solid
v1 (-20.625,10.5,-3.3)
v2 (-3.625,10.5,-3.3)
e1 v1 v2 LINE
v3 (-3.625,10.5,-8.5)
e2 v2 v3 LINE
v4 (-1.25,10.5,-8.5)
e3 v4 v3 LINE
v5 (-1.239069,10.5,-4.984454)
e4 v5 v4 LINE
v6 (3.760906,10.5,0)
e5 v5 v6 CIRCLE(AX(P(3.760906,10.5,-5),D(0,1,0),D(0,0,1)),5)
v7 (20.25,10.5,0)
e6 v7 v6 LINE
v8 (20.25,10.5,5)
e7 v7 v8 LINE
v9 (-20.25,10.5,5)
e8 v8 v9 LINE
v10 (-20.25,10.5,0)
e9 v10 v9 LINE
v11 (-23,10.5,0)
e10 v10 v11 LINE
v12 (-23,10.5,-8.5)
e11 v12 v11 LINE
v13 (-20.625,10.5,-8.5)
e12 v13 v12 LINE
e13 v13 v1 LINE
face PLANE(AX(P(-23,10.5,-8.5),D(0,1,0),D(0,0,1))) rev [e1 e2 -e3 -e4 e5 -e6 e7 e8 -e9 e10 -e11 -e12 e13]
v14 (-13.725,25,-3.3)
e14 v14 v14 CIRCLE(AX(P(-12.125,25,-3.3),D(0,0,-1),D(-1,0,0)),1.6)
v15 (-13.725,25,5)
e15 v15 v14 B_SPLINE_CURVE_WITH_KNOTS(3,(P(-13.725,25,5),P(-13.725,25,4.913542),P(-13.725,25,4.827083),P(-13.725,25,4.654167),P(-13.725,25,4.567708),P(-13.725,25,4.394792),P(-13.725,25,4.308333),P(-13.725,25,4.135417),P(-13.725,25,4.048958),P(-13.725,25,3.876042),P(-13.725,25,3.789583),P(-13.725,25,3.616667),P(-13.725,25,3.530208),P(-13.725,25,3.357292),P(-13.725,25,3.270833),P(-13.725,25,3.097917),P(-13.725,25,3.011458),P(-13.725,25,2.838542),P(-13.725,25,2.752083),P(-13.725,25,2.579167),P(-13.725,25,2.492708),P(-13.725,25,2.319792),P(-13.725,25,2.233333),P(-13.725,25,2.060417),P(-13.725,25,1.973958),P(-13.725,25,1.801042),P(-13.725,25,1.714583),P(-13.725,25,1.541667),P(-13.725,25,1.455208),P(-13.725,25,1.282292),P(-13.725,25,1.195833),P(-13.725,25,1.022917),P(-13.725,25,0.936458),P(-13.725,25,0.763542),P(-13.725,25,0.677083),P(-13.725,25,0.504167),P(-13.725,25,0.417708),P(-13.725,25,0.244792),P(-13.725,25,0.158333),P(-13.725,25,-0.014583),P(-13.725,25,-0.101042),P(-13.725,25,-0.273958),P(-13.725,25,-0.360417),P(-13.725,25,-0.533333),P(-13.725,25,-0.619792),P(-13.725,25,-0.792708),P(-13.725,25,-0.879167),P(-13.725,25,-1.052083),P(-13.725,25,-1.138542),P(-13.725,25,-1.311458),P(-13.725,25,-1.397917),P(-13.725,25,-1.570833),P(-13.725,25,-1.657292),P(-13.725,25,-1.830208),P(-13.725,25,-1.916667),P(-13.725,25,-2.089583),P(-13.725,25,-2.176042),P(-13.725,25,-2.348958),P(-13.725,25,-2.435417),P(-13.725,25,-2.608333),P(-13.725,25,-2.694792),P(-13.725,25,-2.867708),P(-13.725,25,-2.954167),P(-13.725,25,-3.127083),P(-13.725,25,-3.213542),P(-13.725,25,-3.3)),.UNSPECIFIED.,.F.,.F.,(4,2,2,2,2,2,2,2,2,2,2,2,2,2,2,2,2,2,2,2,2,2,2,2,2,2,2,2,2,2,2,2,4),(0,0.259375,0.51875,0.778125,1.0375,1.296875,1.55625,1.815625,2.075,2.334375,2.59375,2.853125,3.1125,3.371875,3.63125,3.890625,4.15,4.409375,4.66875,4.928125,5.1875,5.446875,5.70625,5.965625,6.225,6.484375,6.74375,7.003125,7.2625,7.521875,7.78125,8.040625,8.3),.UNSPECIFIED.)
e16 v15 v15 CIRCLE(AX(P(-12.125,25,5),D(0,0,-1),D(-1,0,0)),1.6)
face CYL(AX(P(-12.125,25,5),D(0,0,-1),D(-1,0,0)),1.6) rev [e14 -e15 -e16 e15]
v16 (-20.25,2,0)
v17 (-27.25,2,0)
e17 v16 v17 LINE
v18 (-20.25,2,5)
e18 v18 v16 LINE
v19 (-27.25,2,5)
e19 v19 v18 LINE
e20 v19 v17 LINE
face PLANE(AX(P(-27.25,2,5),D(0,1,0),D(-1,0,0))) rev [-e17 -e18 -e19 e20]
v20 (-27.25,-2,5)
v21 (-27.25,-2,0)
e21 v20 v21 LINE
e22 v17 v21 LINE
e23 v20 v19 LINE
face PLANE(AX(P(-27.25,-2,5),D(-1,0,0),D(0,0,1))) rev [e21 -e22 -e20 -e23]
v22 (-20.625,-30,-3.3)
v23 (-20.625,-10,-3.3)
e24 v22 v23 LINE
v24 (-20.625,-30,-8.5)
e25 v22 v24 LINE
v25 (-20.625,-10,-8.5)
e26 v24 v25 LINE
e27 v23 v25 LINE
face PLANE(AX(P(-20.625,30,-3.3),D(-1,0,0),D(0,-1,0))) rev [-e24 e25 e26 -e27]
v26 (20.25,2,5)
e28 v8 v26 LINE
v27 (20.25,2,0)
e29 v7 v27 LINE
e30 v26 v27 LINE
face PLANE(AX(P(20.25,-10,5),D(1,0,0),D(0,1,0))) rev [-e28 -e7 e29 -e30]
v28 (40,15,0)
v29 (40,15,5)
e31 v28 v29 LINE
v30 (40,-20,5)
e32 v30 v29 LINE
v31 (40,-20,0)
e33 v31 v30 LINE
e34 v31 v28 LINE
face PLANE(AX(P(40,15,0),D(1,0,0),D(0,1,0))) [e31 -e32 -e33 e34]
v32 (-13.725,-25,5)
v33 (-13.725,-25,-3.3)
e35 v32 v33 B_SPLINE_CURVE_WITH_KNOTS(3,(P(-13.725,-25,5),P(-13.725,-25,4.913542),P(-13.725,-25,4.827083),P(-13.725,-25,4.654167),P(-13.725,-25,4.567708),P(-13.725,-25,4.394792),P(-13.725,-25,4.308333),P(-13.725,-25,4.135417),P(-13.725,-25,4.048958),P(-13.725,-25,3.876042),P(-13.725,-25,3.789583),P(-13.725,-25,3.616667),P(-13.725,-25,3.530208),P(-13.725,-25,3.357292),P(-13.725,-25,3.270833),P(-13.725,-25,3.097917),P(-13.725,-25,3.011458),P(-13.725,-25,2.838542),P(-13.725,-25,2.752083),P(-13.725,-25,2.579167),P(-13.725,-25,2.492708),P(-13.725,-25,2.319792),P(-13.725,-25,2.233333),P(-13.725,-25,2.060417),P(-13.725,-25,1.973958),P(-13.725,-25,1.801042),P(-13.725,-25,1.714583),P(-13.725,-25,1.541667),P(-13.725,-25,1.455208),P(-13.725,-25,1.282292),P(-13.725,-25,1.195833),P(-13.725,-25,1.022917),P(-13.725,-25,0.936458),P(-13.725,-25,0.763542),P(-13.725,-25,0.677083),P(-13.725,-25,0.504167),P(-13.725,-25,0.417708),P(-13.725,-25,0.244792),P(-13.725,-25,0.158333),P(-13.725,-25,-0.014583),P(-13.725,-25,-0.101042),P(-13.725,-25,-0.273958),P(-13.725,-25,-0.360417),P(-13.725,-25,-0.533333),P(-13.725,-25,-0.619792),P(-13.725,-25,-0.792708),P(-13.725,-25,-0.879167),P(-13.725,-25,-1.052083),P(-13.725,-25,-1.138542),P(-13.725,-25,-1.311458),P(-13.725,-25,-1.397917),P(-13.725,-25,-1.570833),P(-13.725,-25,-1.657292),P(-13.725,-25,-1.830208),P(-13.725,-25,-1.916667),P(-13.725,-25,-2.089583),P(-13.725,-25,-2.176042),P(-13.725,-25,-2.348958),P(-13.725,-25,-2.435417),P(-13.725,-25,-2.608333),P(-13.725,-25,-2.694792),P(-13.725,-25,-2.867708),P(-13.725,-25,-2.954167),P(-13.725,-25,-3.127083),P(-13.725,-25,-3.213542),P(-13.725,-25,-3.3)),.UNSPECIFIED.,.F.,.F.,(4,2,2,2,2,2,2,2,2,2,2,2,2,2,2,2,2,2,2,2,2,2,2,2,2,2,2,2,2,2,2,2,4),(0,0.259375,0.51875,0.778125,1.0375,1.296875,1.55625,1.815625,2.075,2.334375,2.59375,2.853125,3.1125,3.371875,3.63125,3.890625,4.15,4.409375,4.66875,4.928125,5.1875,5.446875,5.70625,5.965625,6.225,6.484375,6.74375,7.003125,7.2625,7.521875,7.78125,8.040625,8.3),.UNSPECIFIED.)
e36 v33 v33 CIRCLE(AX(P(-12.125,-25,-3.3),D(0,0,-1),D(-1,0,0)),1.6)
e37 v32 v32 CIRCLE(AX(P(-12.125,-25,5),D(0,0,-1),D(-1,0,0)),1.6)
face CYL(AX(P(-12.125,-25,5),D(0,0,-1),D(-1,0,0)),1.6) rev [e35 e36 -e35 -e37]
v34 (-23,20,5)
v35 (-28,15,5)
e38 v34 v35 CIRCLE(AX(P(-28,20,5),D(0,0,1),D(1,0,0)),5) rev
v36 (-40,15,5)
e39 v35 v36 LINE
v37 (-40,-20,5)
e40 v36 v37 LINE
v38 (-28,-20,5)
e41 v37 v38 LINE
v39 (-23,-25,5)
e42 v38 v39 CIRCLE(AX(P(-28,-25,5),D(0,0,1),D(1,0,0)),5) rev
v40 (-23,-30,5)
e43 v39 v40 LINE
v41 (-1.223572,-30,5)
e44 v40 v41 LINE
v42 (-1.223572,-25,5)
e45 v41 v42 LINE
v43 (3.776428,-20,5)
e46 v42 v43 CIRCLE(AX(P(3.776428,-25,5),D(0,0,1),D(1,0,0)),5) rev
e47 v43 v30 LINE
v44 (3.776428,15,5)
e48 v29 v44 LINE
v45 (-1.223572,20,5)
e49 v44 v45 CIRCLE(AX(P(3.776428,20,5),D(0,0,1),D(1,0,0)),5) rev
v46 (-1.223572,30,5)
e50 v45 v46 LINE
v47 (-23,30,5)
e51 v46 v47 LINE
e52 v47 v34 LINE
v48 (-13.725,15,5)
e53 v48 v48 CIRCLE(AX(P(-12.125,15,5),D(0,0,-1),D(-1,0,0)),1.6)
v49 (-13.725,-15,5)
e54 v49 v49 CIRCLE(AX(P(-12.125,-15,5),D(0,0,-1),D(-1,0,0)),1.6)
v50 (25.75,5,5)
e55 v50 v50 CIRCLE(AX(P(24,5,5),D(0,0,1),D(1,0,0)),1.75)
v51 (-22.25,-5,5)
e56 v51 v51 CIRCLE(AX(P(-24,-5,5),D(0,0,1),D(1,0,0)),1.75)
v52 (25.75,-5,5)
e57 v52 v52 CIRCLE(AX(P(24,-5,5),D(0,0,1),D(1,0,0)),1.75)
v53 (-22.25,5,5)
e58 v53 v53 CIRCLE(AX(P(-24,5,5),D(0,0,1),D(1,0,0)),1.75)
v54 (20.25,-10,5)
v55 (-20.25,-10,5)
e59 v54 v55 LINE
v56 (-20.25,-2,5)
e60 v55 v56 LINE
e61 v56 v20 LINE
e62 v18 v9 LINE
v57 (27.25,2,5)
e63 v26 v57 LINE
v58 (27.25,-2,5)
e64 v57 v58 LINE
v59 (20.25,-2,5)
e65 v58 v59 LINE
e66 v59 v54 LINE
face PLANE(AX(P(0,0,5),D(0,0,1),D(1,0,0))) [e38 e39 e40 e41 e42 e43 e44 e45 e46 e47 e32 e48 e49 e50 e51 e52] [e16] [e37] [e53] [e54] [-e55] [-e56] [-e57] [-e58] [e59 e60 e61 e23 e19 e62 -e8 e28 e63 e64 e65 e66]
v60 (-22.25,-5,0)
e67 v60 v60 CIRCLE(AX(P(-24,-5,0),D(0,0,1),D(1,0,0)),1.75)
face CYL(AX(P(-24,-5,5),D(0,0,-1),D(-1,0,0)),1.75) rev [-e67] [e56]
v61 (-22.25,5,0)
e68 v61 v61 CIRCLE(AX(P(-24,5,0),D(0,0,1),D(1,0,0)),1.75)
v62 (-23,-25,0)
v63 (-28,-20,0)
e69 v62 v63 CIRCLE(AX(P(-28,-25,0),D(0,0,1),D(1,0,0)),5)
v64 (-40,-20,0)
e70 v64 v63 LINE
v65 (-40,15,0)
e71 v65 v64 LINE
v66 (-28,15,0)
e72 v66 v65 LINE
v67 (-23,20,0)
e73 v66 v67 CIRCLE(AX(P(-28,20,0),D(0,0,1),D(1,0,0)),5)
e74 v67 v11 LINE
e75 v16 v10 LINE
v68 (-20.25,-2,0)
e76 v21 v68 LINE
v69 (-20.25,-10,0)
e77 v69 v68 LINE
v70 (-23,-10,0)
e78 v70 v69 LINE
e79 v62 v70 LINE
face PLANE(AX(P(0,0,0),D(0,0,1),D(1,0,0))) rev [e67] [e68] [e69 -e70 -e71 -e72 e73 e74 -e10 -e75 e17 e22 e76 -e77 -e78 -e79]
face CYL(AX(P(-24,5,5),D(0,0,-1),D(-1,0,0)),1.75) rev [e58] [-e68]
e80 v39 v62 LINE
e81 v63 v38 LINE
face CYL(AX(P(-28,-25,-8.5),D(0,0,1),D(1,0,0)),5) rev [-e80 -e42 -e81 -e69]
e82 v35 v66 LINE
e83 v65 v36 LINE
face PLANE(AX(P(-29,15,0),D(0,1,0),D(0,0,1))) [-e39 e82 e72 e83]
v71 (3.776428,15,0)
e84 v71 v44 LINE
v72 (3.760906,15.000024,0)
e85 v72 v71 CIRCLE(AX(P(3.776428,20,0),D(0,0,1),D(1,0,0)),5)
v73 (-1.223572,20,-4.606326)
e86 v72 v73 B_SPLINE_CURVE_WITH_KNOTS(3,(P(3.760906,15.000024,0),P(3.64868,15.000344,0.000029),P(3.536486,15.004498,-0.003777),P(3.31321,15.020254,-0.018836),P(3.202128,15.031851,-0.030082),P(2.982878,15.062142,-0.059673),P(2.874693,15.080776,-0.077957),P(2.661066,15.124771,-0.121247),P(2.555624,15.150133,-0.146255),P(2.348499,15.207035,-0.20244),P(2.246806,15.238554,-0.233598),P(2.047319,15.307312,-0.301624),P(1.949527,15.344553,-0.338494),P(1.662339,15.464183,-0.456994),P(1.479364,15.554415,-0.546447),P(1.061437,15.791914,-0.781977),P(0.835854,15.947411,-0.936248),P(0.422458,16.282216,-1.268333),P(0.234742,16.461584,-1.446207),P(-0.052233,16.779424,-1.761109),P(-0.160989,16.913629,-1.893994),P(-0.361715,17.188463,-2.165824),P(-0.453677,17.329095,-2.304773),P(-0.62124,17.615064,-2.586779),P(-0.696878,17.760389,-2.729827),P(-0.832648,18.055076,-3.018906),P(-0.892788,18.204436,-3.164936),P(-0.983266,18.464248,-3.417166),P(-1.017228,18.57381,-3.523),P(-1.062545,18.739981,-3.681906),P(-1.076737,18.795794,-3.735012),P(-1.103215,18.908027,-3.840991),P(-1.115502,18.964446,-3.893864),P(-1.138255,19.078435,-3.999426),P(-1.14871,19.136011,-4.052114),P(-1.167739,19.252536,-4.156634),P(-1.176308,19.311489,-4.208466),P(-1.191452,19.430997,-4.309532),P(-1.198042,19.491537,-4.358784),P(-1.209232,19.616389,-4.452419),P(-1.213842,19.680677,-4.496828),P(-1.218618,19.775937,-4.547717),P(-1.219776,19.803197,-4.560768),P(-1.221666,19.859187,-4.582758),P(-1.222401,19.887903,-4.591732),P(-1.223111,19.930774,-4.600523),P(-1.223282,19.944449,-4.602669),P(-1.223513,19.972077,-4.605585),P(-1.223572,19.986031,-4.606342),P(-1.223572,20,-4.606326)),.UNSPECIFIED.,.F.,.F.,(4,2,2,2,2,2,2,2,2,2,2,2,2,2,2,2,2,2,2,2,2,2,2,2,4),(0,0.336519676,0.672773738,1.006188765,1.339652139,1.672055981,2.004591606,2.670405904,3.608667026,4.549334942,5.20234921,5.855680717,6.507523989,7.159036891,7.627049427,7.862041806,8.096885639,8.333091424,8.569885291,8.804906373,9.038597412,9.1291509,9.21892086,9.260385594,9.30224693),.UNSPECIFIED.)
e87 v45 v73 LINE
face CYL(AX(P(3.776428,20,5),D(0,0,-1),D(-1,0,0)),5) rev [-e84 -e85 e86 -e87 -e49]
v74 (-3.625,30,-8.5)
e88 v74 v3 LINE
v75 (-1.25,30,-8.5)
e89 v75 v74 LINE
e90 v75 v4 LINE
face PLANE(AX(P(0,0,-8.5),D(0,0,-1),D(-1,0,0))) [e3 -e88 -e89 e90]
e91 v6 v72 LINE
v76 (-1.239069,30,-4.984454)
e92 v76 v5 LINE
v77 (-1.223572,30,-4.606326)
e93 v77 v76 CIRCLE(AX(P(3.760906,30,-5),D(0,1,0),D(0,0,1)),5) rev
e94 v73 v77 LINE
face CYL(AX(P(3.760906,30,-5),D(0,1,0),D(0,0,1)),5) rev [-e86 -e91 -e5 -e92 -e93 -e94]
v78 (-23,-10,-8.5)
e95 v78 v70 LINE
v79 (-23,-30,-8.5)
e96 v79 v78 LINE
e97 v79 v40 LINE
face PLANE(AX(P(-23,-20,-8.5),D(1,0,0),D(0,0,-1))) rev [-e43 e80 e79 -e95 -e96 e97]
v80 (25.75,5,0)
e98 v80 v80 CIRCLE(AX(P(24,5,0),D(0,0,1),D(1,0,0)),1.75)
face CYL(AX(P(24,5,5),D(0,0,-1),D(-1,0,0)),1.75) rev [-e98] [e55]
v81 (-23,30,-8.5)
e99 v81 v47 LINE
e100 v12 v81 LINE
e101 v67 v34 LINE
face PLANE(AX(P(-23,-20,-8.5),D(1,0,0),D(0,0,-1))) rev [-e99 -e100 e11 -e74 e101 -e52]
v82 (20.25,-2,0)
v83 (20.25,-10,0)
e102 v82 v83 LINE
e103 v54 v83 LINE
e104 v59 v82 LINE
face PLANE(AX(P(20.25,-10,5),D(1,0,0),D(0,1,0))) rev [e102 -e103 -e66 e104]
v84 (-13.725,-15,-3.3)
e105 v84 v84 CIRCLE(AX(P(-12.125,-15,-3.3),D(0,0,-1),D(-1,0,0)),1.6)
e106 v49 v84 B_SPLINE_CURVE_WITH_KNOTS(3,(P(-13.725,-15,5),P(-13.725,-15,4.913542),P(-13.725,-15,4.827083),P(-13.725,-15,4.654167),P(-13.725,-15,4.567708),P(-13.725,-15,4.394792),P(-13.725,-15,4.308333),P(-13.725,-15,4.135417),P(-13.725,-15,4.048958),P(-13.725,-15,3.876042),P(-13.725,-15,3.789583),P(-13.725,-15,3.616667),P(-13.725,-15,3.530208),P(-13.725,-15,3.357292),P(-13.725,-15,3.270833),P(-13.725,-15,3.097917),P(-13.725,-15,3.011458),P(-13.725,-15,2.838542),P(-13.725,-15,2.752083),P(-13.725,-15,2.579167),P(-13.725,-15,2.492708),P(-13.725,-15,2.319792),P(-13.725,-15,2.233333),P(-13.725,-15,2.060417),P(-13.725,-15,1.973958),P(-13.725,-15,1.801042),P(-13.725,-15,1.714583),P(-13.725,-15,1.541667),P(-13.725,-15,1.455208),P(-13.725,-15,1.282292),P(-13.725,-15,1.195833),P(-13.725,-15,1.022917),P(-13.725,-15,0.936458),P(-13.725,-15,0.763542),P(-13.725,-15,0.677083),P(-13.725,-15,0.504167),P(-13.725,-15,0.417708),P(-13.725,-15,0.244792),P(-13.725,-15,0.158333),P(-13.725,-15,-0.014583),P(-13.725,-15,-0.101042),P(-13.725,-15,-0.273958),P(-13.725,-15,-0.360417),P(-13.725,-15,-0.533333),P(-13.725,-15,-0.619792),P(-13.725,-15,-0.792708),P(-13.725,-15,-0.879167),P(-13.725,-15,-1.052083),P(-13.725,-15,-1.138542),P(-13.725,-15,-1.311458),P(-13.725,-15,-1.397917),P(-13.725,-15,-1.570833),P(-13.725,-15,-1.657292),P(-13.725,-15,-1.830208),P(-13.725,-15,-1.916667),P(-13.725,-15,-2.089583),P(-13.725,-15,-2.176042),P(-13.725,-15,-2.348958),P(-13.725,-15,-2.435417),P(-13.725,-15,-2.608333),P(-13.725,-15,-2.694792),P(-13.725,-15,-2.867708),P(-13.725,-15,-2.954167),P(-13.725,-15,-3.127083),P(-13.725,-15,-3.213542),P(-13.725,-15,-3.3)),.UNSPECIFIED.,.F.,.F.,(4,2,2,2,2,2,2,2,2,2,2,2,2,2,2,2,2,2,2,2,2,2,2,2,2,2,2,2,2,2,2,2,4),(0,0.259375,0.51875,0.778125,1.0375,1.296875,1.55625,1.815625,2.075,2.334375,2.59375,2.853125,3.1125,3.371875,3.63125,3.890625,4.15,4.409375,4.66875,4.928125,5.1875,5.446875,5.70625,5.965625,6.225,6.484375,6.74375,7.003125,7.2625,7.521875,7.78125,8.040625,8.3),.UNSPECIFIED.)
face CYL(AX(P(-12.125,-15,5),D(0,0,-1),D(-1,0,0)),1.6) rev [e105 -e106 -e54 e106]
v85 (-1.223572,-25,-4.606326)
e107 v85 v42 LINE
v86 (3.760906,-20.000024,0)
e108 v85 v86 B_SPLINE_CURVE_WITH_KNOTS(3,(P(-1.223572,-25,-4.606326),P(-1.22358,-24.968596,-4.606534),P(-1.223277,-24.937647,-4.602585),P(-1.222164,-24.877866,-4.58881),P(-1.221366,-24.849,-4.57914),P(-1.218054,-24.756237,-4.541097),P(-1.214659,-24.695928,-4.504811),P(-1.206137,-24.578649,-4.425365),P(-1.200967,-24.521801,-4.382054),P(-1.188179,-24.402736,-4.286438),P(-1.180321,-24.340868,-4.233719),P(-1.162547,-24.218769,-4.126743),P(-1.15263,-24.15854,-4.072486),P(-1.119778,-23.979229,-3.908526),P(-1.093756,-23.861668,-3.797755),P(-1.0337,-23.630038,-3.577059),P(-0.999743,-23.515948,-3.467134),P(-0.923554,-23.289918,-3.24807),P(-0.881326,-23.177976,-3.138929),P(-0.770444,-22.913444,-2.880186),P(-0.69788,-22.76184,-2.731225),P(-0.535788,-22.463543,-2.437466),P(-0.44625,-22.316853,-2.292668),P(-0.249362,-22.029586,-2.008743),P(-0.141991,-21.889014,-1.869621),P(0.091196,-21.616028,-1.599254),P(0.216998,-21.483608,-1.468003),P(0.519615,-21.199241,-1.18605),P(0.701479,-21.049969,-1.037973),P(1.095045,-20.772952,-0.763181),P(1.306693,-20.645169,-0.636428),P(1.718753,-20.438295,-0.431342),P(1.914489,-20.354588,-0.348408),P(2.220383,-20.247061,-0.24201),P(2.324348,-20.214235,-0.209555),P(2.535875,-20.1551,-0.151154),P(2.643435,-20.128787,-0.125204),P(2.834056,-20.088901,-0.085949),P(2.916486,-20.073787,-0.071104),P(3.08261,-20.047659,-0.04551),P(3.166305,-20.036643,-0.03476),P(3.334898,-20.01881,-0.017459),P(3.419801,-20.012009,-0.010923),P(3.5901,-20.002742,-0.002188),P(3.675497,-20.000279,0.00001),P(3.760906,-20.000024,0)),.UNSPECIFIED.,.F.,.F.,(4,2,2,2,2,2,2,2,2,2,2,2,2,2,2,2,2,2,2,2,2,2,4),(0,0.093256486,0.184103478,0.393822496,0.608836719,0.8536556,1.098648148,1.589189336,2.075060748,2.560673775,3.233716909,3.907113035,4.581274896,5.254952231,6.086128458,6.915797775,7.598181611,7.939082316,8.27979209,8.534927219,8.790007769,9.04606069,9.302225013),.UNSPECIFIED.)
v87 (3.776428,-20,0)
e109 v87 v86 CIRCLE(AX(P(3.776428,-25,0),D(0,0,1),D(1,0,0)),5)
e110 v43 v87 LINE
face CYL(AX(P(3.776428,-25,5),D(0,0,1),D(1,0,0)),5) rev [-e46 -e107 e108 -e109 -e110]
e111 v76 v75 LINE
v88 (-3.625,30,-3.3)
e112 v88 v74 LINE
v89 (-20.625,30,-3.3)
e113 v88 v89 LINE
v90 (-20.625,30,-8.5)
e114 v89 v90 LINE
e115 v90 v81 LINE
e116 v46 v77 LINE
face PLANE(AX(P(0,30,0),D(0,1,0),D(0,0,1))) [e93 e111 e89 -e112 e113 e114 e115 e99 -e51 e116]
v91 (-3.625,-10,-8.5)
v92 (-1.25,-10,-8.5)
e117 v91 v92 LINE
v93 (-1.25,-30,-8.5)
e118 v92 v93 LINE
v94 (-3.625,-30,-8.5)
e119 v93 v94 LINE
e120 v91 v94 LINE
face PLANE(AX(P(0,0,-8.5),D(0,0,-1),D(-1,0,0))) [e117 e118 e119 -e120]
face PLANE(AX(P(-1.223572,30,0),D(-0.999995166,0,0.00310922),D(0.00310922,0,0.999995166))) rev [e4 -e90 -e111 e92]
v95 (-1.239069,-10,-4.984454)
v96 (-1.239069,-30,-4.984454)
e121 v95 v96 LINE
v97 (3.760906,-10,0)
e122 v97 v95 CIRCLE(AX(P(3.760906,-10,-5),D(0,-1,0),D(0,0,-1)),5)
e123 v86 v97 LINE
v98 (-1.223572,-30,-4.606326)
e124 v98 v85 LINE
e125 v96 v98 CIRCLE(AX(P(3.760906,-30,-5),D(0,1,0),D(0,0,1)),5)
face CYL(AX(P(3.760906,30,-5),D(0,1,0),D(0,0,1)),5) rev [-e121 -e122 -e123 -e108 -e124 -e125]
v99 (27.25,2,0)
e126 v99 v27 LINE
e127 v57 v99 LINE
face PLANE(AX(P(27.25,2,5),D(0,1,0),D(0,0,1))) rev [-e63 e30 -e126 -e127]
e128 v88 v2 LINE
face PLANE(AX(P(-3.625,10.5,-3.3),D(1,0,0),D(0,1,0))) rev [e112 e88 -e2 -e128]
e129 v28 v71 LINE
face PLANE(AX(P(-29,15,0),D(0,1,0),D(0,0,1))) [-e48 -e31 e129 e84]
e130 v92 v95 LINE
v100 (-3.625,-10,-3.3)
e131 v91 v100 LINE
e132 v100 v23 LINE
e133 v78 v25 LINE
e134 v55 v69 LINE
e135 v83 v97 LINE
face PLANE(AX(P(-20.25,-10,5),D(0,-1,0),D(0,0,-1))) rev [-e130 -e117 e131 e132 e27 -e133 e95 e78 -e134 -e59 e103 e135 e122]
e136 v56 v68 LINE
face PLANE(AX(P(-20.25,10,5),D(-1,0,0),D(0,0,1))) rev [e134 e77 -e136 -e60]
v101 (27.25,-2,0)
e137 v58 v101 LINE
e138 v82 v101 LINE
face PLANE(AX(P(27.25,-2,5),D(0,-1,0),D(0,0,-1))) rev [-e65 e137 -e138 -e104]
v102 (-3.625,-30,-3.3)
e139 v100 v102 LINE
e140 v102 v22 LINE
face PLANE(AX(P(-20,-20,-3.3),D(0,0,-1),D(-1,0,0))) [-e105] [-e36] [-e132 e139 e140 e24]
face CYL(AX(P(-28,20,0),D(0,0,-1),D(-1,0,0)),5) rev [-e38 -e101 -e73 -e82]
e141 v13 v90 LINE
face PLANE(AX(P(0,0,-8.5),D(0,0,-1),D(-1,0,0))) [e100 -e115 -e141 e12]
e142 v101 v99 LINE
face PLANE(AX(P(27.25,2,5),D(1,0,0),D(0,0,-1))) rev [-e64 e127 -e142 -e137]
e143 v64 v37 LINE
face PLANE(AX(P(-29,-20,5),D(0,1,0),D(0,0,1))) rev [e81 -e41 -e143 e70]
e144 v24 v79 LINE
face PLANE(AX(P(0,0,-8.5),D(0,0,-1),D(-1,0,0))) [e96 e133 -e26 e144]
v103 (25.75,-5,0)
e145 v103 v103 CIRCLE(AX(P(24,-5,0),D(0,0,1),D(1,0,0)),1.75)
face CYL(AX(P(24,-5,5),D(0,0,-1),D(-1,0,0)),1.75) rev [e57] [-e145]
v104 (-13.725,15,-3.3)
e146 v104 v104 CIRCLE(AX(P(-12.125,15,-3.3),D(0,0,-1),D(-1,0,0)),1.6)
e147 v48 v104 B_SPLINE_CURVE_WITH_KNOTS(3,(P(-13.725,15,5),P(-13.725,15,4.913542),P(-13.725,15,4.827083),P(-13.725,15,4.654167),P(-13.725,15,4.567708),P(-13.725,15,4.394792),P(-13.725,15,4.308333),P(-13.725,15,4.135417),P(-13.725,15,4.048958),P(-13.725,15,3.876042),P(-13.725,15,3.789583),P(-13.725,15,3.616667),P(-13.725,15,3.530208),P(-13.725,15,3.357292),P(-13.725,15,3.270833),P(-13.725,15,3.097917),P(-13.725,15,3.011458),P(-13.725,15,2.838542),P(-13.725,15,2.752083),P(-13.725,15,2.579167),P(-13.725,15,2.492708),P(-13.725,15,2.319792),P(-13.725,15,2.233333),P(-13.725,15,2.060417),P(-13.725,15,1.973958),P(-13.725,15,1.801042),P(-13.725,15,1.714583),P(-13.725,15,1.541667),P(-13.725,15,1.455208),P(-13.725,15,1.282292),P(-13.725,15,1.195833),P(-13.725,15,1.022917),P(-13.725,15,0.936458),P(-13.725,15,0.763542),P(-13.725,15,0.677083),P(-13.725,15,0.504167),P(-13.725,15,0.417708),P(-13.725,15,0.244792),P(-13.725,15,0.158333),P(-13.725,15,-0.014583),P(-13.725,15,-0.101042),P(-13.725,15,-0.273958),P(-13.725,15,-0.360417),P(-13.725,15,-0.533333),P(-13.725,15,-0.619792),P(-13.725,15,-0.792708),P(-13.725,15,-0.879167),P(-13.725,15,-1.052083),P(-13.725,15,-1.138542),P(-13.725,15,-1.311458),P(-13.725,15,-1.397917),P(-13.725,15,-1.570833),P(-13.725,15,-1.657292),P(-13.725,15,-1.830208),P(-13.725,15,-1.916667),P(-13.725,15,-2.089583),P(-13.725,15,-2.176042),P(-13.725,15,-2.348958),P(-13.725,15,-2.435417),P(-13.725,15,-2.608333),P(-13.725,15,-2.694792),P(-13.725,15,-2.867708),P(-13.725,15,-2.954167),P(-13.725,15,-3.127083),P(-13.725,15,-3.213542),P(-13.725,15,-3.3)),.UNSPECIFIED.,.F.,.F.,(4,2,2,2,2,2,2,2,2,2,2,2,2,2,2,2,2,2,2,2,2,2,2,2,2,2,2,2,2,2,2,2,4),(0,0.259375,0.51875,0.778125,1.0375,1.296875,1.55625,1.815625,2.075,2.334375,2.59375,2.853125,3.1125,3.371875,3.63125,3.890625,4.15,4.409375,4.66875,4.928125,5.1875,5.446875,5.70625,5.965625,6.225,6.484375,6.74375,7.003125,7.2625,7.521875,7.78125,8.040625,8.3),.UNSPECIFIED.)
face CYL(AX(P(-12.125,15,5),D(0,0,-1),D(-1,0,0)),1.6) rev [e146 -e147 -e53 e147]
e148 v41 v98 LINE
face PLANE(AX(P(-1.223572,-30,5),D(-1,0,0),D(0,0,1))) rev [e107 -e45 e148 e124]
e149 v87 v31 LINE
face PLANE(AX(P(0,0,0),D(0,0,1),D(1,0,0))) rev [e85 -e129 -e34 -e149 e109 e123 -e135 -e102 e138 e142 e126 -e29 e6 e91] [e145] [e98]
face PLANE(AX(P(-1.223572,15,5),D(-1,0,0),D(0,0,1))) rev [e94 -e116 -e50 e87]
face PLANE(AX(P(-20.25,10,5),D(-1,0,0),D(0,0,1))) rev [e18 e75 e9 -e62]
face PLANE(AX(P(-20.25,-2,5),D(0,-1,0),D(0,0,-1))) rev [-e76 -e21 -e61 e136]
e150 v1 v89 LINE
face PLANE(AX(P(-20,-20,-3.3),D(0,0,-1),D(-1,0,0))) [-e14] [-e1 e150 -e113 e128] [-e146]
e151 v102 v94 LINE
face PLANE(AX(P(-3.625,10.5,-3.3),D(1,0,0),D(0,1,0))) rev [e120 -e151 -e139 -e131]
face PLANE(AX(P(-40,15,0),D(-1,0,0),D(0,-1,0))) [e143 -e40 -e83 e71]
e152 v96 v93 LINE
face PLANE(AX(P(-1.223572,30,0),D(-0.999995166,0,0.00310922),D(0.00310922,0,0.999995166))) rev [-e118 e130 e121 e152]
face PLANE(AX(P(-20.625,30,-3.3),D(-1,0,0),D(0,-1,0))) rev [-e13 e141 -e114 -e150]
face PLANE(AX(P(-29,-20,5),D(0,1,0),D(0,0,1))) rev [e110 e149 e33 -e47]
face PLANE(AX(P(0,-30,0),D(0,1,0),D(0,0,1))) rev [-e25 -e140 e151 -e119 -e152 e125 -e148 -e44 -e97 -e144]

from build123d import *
from OCP.BRepAlgoAPI import BRepAlgoAPI_Cut
from OCP.TopTools import TopTools_ListOfShape

# Parameters (mm, degrees)
SKETCH_1_R               = 1.75
EXTRUDE_1_DEPTH          = 5
SKETCH_2_W               = 3
SKETCH_2_H               = 10
EXTRUDE_2_DEPTH          = 8.5
SKETCH_3_W               = 15.75
SKETCH_3_H               = 3.3
EXTRUDE_3_DEPTH          = 10
EXTRUDE_4_DEPTH          = 30
SKETCH_6_W               = 21.776428499
SKETCH_6_H               = 20.5
CUT_EXTRUDE_2_DEPTH      = 43.582273307
SKETCH_7_W               = 58
SKETCH_7_H               = 5
EXTRUDE_5_DEPTH          = 5
SKETCH_8_W               = 40.5
SKETCH_8_H               = 0.5
CUT_EXTRUDE_3_DEPTH      = 44.854874301
SKETCH_9_W               = 21.776428499
SKETCH_9_H               = 15
SKETCH_9_H_2             = 10
EXTRUDE_6_DEPTH          = 5
FILLET_1_R               = 5
SKETCH_10_R              = 1.6
CUT_EXTRUDE_4_DEPTH      = 43.542801976
FILLET_START             = 10.5
FILLET_2_DEPTH           = 9.5
FILLET_START_2           = 19.239089818
FILLET_2_2_DEPTH         = 10.760910182
FILLET_START_3           = -4.606326438
FILLET_2_3_DEPTH         = 4.606326438
FILLET_START_4           = -19.9999999
FILLET_3_DEPTH           = 9.9999999
FILLET_START_5           = -30
FILLET_3_2_DEPTH         = 17.8876
FILLET_START_6           = -4.606334035
FILLET_3_3_DEPTH         = 4.606334035
FILLET_START_7           = -25
FILLET_3_4_DEPTH         = 5
FILLET_START_8           = -20.000021607
FILLET_3_5_DEPTH         = 2.1607e-05
SKETCH_11_W              = 11
SKETCH_11_H              = 35
EXTRUDE_7_DEPTH          = 5
SKETCH_12_W              = 10
SKETCH_12_H              = 10
EXTRUDE_8_DEPTH          = 5
SKETCH_14_W              = 0.625
SKETCH_14_H              = 60
CUT_EXTRUDE_5_DEPTH      = 5.2
SKETCH_15_W              = 10
SKETCH_15_H              = 10
CUT_EXTRUDE_6_DEPTH      = 10
CUT_EXTRUDE_7_DEPTH      = 51.717354032
CUT_EXTRUDE_7_DEPTH_BACK = 51.717354032
SKETCH_16_W              = 7
SKETCH_16_H              = 4


with BuildPart() as part:
    # ｽｹｯﾁ1 → ﾎﾞｽ - 押し出し1 (new body)
    with BuildSketch(Plane.XY):
        Polygon((-20.25, 10), (-20.25, -10), (20.25, -10), (20.25, 10), (29, 10), (29, -20), (-29, -20), (-29, 10), align=None)
        with Locations((-24, 5)):
            Circle(SKETCH_1_R, mode=Mode.SUBTRACT)
        with Locations((-24, -5)):
            Circle(SKETCH_1_R, mode=Mode.SUBTRACT)
        with Locations((24, 5)):
            Circle(SKETCH_1_R, mode=Mode.SUBTRACT)
        with Locations((24, -5)):
            Circle(SKETCH_1_R, mode=Mode.SUBTRACT)
    extrude(amount=EXTRUDE_1_DEPTH)

    # ｽｹｯﾁ2 → ﾎﾞｽ - 押し出し2 (add)
    with BuildSketch(Plane(origin=(0, 0, 0), x_dir=(-1, 0, 0), z_dir=(0, 0, -1))):
        with Locations((21.5, -15)):
            Rectangle(SKETCH_2_W, SKETCH_2_H)
        with Locations((2.75, -15)):
            Rectangle(SKETCH_2_W, SKETCH_2_H)
    extrude(amount=EXTRUDE_2_DEPTH)

    # ｽｹｯﾁ3 → ﾎﾞｽ - 押し出し3 (add)
    with BuildSketch(Plane(origin=(0, -10, 0), x_dir=(1, 0, 0), z_dir=(0, 1, 0))):
        with Locations((-12.125, 1.65)):
            Rectangle(SKETCH_3_W, SKETCH_3_H)
    extrude(amount=-EXTRUDE_3_DEPTH)

    # ｽｹｯﾁ4 → ﾎﾞｽ - 押し出し4 (add, symmetric)
    with BuildSketch(Plane(origin=(0, 0, 0), x_dir=(1, 0, 0), z_dir=(0, 1, 0))):
        Polygon((-23, 8.5), (-23, 0), (-1.223571501, 0), (-1.25, 8.5), (-4.25, 8.5), (-4.25, 3.3), (-20, 3.3), (-20, 8.5), align=None)
    extrude(amount=EXTRUDE_4_DEPTH, both=True)

    # ｽｹｯﾁ6 → ｶｯﾄ - 押し出し2 (cut, through all)
    with BuildSketch(Plane.XY):
        with Locations((-12.11178575, 0.25)):
            Rectangle(SKETCH_6_W, SKETCH_6_H)
    extrude(amount=-CUT_EXTRUDE_2_DEPTH, mode=Mode.SUBTRACT)


with BuildPart() as cut_extrude_2_piece_1:
    # of the separate pieces the step leaves, piece 1, a body of its own (cut_extrude_2_pieces)
    add(part.part.solids().sort_by_distance((-20.25, 10, 0))[0])



with BuildPart() as cut_extrude_2_piece_2:
    # of the separate pieces the step leaves, piece 2, a body of its own (cut_extrude_2_pieces)
    add(part.part.solids().sort_by_distance((-23, 10.5, 0))[0])


with BuildPart() as cut_extrude_2_piece_1_1:
    add(cut_extrude_2_piece_1.part)

    add(cut_extrude_2_piece_2.part)  # ﾎﾞｽ - 押し出し5 merges ｶｯﾄ - 押し出し2 piece 2
    # ｽｹｯﾁ7 → ﾎﾞｽ - 押し出し5 (add)
    with BuildSketch(Plane.XY.offset(5)):
        with Locations((0, 12.5)):
            Rectangle(SKETCH_7_W, SKETCH_7_H)
    extrude(amount=-EXTRUDE_5_DEPTH)

    # ｽｹｯﾁ8 → ｶｯﾄ - 押し出し3 (cut, through all)
    with BuildSketch(Plane.XY.offset(5)):
        with Locations((0, 10.25)):
            Rectangle(SKETCH_8_W, SKETCH_8_H)
    extrude(amount=-CUT_EXTRUDE_3_DEPTH, mode=Mode.SUBTRACT)

    # ｽｹｯﾁ9 → ﾎﾞｽ - 押し出し6 (add)
    with BuildSketch(Plane.XY):
        with Locations((-12.11178575, 22.5)):
            Rectangle(SKETCH_9_W, SKETCH_9_H)
        with Locations((-12.11178575, -25)):
            Rectangle(SKETCH_9_W, SKETCH_9_H_2)
    extrude(amount=EXTRUDE_6_DEPTH)

    # ﾌｨﾚｯﾄ1
    # the kernel refuses this fillet: 5 mm, written as the material it adds along each edge
    with BuildSketch(Plane(origin=(-23, 15, 0), x_dir=(-1, 0, 0), z_dir=(0, 0, 1))) as fillet_1_piece_1:
        with BuildLine():
            CenterArc((FILLET_1_R, -FILLET_1_R), FILLET_1_R, 90, 90)
            Line((0, -FILLET_1_R), (0, 0))
            Line((0, 0), (FILLET_1_R, 0))
        make_face()
    extrude(amount=5)
    with BuildSketch(Plane(origin=(-1.223571501, 15, 0), x_dir=(1, 0, 0), z_dir=(0, 0, 1))) as fillet_1_piece_2_section:
        with BuildLine():
            CenterArc((FILLET_1_R, FILLET_1_R), FILLET_1_R, 180, 90)
            Line((0, FILLET_1_R), (0, 0))
            Line((0, 0), (FILLET_1_R, 0))
        make_face()
    fillet_1_piece_2 = extrude(amount=5, mode=Mode.PRIVATE)
    fillet_1_piece_2 = split(fillet_1_piece_2, bisect_by=Plane(origin=(-1.223571501, 15, 0), z_dir=(0.9999951663633728, 0, -0.003109220141828846)), keep=Keep.TOP, mode=Mode.PRIVATE)
    add(fillet_1_piece_2)
    with BuildSketch(Plane(origin=(-1.223571501, 15, 0), x_dir=(1, 0, 0), z_dir=(0, 0, 1))) as fillet_1_piece_3_section:
        with BuildLine():
            CenterArc((FILLET_1_R, FILLET_1_R), FILLET_1_R, 180, 90)
            Line((0, FILLET_1_R), (0, 0))
            Line((0, 0), (FILLET_1_R, 0))
        make_face()
    fillet_1_piece_3 = extrude(amount=5, mode=Mode.PRIVATE)
    fillet_1_piece_3 = split(fillet_1_piece_3, bisect_by=Plane(origin=(-1.223571501, 15, 0), z_dir=(-0.9999951663633728, 0, 0.003109220141828846)), keep=Keep.TOP, mode=Mode.PRIVATE)
    add(fillet_1_piece_3)
    with BuildSketch(Plane(origin=(-1.223571501, -20, 0), x_dir=(1, 0, 0), z_dir=(0, 0, 1))) as fillet_1_piece_4_section:
        with BuildLine():
            CenterArc((FILLET_1_R, -FILLET_1_R), FILLET_1_R, 90, 90)
            Line((0, -FILLET_1_R), (0, 0))
            Line((0, 0), (FILLET_1_R, 0))
        make_face()
    fillet_1_piece_4 = extrude(amount=5, mode=Mode.PRIVATE)
    fillet_1_piece_4 = split(fillet_1_piece_4, bisect_by=Plane(origin=(-1.223571501, -20, 0), z_dir=(0.9999951663633728, 0, -0.003109220141828846)), keep=Keep.TOP, mode=Mode.PRIVATE)
    add(fillet_1_piece_4)
    with BuildSketch(Plane(origin=(-1.223571501, -20, 0), x_dir=(1, 0, 0), z_dir=(0, 0, 1))) as fillet_1_piece_5_section:
        with BuildLine():
            CenterArc((FILLET_1_R, -FILLET_1_R), FILLET_1_R, 90, 90)
            Line((0, -FILLET_1_R), (0, 0))
            Line((0, 0), (FILLET_1_R, 0))
        make_face()
    fillet_1_piece_5 = extrude(amount=5, mode=Mode.PRIVATE)
    fillet_1_piece_5 = split(fillet_1_piece_5, bisect_by=Plane(origin=(-1.223571501, -20, 0), z_dir=(-0.9999951663633728, 0, 0.003109220141828846)), keep=Keep.TOP, mode=Mode.PRIVATE)
    add(fillet_1_piece_5)
    with BuildSketch(Plane(origin=(-23, -20, 0), x_dir=(-1, 0, 0), z_dir=(0, 0, 1))) as fillet_1_piece_6:
        with BuildLine():
            CenterArc((FILLET_1_R, FILLET_1_R), FILLET_1_R, 180, 90)
            Line((0, FILLET_1_R), (0, 0))
            Line((0, 0), (FILLET_1_R, 0))
        make_face()
    extrude(amount=5)

    # ｽｹｯﾁ10 → ｶｯﾄ - 押し出し4 (cut, through all)
    with BuildSketch(Plane(origin=(0, 0, -3.3), x_dir=(-1, 0, 0), z_dir=(0, 0, -1))):
        with Locations((12.125, 25)):
            Circle(SKETCH_10_R)
        with Locations((12.125, 15)):
            Circle(SKETCH_10_R)
        with Locations((12.125, -15)):
            Circle(SKETCH_10_R)
        with Locations((12.125, -25)):
            Circle(SKETCH_10_R)
    extrude(amount=-CUT_EXTRUDE_4_DEPTH, mode=Mode.SUBTRACT)

    # ﾌｨﾚｯﾄ2: read off the stored shape, not the designer's step
    # ﾌｨﾚｯﾄ2 outline → ﾌｨﾚｯﾄ2 (add)
    with BuildSketch(Plane(origin=(0, 0, 0), x_dir=(1, 0, 0), z_dir=(0, 1, 0)).offset(FILLET_START)):
        with BuildLine():
            ThreePointArc((3.760906491, 0), (0.230873241, 1.458973983), (-1.23906934, 4.984453899))
            Line((-1.23906934, 4.984453899), (-1.223571501, 0))
            Line((-1.223571501, 0), (3.760906491, 0))
        make_face()
    extrude(amount=FILLET_2_DEPTH)

    # Fillet 2 2 outline → Fillet 2 2 (add)
    with BuildSketch(Plane(origin=(0, 0, 0), x_dir=(1, 0, 0), z_dir=(0, 1, 0)).offset(FILLET_START_2)):
        with BuildLine():
            Line((-1.223571501, 0), (-1.223571501, 4.606326096))
            ThreePointArc((-1.223571501, 4.606326096), (-1.234899219, 4.795243318), (-1.23906934, 4.984453899))
            Line((-1.23906934, 4.984453899), (-1.223571501, 0))
        make_face()
    extrude(amount=FILLET_2_2_DEPTH)

    # Fillet 2 3 outline → Fillet 2 3 (cut)
    with BuildSketch(Plane.XY.offset(FILLET_START_3)):
        with BuildLine():
            ThreePointArc((-1.223571501, 20), (0.240894593, 16.464466094), (3.776428499, 15))
            Line((3.776428499, 15), (5, 15))
            Line((5, 15), (5, 20))
            Line((5, 20), (-1.223571501, 20))
        make_face()
    extrude(amount=FILLET_2_3_DEPTH, mode=Mode.SUBTRACT)


with BuildPart() as fillet_3_tool:
    # ﾌｨﾚｯﾄ3: read off the stored shape, not the designer's step
    # ﾌｨﾚｯﾄ3 outline → ﾌｨﾚｯﾄ3 (new body)
    with BuildSketch(Plane(origin=(0, 0, 0), x_dir=(1, 0, 0), z_dir=(0, 1, 0)).offset(FILLET_START_4)):
        with BuildLine():
            ThreePointArc((3.760906491, 0), (0.230873241, 1.458973983), (-1.23906934, 4.984453899))
            Line((-1.23906934, 4.984453899), (-1.223571501, 0))
            Line((-1.223571501, 0), (3.760906491, 0))
        make_face()
    extrude(amount=FILLET_3_DEPTH)


with BuildPart() as cut_extrude_2_piece_1_2:
    add(cut_extrude_2_piece_1_1.part)


with BuildPart() as cut_extrude_2_piece_1_3:
    # ﾌｨﾚｯﾄ3: joined with fillet_3_tool
    add(cut_extrude_2_piece_1_2.part.fuse(fillet_3_tool.part, tol=0.00001))


with BuildPart() as fillet_3_2_tool:
    # Fillet 3 2 outline → Fillet 3 2 (new body)
    with BuildSketch(Plane(origin=(0, 0, 0), x_dir=(1, 0, 0), z_dir=(0, 1, 0)).offset(FILLET_START_5)):
        with BuildLine():
            Line((-1.223571501, 0), (-1.223571501, 4.606326096))
            ThreePointArc((-1.223571501, 4.606326096), (-1.234899219, 4.795243318), (-1.23906934, 4.984453899))
            Line((-1.23906934, 4.984453899), (-1.223571501, 0))
        make_face()
    extrude(amount=FILLET_3_2_DEPTH)


with BuildPart() as cut_extrude_2_piece_1_4:
    add(cut_extrude_2_piece_1_3.part)


with BuildPart() as cut_extrude_2_piece_1_5:
    # Fillet 3 2: joined with fillet_3_2_tool
    add(cut_extrude_2_piece_1_4.part.fuse(fillet_3_2_tool.part, tol=0.00001))


with BuildPart() as fillet_3_3_tool:
    # Fillet 3 3 outline → Fillet 3 3 (new body)
    with BuildSketch(Plane.XY.offset(FILLET_START_6)):
        with BuildLine():
            ThreePointArc((-1.223571501, -25), (0.235411013, -21.469958192), (3.760906566, -20.000024093))
            Line((3.760906566, -20.000024093), (-1.223571501, -19.9999999))
            Line((-1.223571501, -19.9999999), (-1.223571501, -25))
        make_face()
    extrude(amount=FILLET_3_3_DEPTH)


with BuildPart() as cut_extrude_2_piece_1_6:
    add(cut_extrude_2_piece_1_5.part)


with BuildPart() as cut_extrude_2_piece_1_7:
    # Fillet 3 3: joined with fillet_3_3_tool
    add(cut_extrude_2_piece_1_6.part.fuse(fillet_3_3_tool.part, tol=0.00001))


with BuildPart() as fillet_3_4_tool:
    # Fillet 3 4 outline → Fillet 3 4 (new body)
    with BuildSketch(Plane(origin=(0, 0, 0), x_dir=(1, 0, 0), z_dir=(0, 1, 0)).offset(FILLET_START_7)):
        with BuildLine():
            ThreePointArc((-1.223571501, 4.606326096), (0.367410471, 1.327918198), (3.760906491, 0))
            Line((3.760906491, 0), (3.760906566, 4.606334035))
            Line((3.760906566, 4.606334035), (-1.223571501, 4.606326096))
        make_face()
    extrude(amount=FILLET_3_4_DEPTH)


with BuildPart() as cut_extrude_2_piece_1_8:
    add(cut_extrude_2_piece_1_7.part)

    # Fillet 3 4: cut by fillet_3_4_tool, with a tolerance
    fillet_3_4_stock = TopTools_ListOfShape()
    fillet_3_4_stock.Append(cut_extrude_2_piece_1_8.part.wrapped)
    fillet_3_4_tools = TopTools_ListOfShape()
    fillet_3_4_tools.Append(fillet_3_4_tool.part.wrapped)
    fillet_3_4_cut = BRepAlgoAPI_Cut()
    fillet_3_4_cut.SetArguments(fillet_3_4_stock)
    fillet_3_4_cut.SetTools(fillet_3_4_tools)
    fillet_3_4_cut.SetFuzzyValue(0.00001)
    fillet_3_4_cut.Build()
    add(Compound.cast(fillet_3_4_cut.Shape()).solids(), mode=Mode.REPLACE)


with BuildPart() as fillet_3_5_tool:
    # Fillet 3 5 outline → Fillet 3 5 (new body)
    with BuildSketch(Plane(origin=(0, 0, 0), x_dir=(1, 0, 0), z_dir=(0, 1, 0)).offset(FILLET_START_8)):
        with BuildLine():
            Line((-1.223571501, 0), (3.760906491, 0))
            ThreePointArc((3.760906491, 0), (0.367410471, 1.327918198), (-1.223571501, 4.606326096))
            Line((-1.223571501, 4.606326096), (-1.223571501, 0))
        make_face()
    extrude(amount=FILLET_3_5_DEPTH)


with BuildPart() as cut_extrude_2_piece_1_9:
    add(cut_extrude_2_piece_1_8.part)


with BuildPart() as cut_extrude_2_piece_1_10:
    # Fillet 3 5: joined with fillet_3_5_tool
    add(cut_extrude_2_piece_1_9.part.fuse(fillet_3_5_tool.part, tol=0.00001))

    # ｽｹｯﾁ11 → ﾎﾞｽ - 押し出し7 (add)
    with BuildSketch(Plane.XY.offset(5)):
        with Locations((-34.5, -2.5)):
            Rectangle(SKETCH_11_W, SKETCH_11_H)
        with Locations((34.5, -2.5)):
            Rectangle(SKETCH_11_W, SKETCH_11_H)
    extrude(amount=-EXTRUDE_7_DEPTH)

    # ｽｹｯﾁ12 → ﾎﾞｽ - 押し出し8 (add)
    with BuildSketch(Plane.XZ.offset(20)):
        with Locations((-35, 10)):
            Rectangle(SKETCH_12_W, SKETCH_12_H)
        with Locations((35, 10)):
            Rectangle(SKETCH_12_W, SKETCH_12_H)
    extrude(amount=-EXTRUDE_8_DEPTH)

    # ｽｹｯﾁ14 → ｶｯﾄ - 押し出し5 (cut)
    with BuildSketch(Plane(origin=(0, 0, -8.5), x_dir=(-1, 0, 0), z_dir=(0, 0, -1))):
        with Locations((20.3125, 0)):
            Rectangle(SKETCH_14_W, SKETCH_14_H)
        Polygon((4.25, 30), (3.625, 30), (3.625, 10.5), (3.625, -30), (4.25, -30), (4.25, 10.5), align=None)
    extrude(amount=-CUT_EXTRUDE_5_DEPTH, mode=Mode.SUBTRACT)

    # ｽｹｯﾁ15 → ｶｯﾄ - 押し出し6 (cut)
    with BuildSketch(Plane(origin=(0, -15, 0), x_dir=(1, 0, 0), z_dir=(0, 1, 0))):
        with Locations((-35, -10)):
            Rectangle(SKETCH_15_W, SKETCH_15_H)
        with Locations((35, -10)):
            Rectangle(SKETCH_15_W, SKETCH_15_H)
    extrude(amount=-CUT_EXTRUDE_6_DEPTH, mode=Mode.SUBTRACT)

    # ｽｹｯﾁ16 → ｶｯﾄ - 押し出し7 (cut, two sides: drawn at the far end of the back side and taken through both)
    with BuildSketch(Plane(origin=(0, 0, 0), x_dir=(-1, 0, 0), z_dir=(0, 0, -1)).offset(-CUT_EXTRUDE_7_DEPTH_BACK)):
        with Locations((23.75, 0)):
            Rectangle(SKETCH_16_W, SKETCH_16_H)
        with Locations((-23.75, 0)):
            Rectangle(SKETCH_16_W, SKETCH_16_H)
    extrude(amount=CUT_EXTRUDE_7_DEPTH + CUT_EXTRUDE_7_DEPTH_BACK, mode=Mode.SUBTRACT)


solid = cut_extrude_2_piece_1_10.part
